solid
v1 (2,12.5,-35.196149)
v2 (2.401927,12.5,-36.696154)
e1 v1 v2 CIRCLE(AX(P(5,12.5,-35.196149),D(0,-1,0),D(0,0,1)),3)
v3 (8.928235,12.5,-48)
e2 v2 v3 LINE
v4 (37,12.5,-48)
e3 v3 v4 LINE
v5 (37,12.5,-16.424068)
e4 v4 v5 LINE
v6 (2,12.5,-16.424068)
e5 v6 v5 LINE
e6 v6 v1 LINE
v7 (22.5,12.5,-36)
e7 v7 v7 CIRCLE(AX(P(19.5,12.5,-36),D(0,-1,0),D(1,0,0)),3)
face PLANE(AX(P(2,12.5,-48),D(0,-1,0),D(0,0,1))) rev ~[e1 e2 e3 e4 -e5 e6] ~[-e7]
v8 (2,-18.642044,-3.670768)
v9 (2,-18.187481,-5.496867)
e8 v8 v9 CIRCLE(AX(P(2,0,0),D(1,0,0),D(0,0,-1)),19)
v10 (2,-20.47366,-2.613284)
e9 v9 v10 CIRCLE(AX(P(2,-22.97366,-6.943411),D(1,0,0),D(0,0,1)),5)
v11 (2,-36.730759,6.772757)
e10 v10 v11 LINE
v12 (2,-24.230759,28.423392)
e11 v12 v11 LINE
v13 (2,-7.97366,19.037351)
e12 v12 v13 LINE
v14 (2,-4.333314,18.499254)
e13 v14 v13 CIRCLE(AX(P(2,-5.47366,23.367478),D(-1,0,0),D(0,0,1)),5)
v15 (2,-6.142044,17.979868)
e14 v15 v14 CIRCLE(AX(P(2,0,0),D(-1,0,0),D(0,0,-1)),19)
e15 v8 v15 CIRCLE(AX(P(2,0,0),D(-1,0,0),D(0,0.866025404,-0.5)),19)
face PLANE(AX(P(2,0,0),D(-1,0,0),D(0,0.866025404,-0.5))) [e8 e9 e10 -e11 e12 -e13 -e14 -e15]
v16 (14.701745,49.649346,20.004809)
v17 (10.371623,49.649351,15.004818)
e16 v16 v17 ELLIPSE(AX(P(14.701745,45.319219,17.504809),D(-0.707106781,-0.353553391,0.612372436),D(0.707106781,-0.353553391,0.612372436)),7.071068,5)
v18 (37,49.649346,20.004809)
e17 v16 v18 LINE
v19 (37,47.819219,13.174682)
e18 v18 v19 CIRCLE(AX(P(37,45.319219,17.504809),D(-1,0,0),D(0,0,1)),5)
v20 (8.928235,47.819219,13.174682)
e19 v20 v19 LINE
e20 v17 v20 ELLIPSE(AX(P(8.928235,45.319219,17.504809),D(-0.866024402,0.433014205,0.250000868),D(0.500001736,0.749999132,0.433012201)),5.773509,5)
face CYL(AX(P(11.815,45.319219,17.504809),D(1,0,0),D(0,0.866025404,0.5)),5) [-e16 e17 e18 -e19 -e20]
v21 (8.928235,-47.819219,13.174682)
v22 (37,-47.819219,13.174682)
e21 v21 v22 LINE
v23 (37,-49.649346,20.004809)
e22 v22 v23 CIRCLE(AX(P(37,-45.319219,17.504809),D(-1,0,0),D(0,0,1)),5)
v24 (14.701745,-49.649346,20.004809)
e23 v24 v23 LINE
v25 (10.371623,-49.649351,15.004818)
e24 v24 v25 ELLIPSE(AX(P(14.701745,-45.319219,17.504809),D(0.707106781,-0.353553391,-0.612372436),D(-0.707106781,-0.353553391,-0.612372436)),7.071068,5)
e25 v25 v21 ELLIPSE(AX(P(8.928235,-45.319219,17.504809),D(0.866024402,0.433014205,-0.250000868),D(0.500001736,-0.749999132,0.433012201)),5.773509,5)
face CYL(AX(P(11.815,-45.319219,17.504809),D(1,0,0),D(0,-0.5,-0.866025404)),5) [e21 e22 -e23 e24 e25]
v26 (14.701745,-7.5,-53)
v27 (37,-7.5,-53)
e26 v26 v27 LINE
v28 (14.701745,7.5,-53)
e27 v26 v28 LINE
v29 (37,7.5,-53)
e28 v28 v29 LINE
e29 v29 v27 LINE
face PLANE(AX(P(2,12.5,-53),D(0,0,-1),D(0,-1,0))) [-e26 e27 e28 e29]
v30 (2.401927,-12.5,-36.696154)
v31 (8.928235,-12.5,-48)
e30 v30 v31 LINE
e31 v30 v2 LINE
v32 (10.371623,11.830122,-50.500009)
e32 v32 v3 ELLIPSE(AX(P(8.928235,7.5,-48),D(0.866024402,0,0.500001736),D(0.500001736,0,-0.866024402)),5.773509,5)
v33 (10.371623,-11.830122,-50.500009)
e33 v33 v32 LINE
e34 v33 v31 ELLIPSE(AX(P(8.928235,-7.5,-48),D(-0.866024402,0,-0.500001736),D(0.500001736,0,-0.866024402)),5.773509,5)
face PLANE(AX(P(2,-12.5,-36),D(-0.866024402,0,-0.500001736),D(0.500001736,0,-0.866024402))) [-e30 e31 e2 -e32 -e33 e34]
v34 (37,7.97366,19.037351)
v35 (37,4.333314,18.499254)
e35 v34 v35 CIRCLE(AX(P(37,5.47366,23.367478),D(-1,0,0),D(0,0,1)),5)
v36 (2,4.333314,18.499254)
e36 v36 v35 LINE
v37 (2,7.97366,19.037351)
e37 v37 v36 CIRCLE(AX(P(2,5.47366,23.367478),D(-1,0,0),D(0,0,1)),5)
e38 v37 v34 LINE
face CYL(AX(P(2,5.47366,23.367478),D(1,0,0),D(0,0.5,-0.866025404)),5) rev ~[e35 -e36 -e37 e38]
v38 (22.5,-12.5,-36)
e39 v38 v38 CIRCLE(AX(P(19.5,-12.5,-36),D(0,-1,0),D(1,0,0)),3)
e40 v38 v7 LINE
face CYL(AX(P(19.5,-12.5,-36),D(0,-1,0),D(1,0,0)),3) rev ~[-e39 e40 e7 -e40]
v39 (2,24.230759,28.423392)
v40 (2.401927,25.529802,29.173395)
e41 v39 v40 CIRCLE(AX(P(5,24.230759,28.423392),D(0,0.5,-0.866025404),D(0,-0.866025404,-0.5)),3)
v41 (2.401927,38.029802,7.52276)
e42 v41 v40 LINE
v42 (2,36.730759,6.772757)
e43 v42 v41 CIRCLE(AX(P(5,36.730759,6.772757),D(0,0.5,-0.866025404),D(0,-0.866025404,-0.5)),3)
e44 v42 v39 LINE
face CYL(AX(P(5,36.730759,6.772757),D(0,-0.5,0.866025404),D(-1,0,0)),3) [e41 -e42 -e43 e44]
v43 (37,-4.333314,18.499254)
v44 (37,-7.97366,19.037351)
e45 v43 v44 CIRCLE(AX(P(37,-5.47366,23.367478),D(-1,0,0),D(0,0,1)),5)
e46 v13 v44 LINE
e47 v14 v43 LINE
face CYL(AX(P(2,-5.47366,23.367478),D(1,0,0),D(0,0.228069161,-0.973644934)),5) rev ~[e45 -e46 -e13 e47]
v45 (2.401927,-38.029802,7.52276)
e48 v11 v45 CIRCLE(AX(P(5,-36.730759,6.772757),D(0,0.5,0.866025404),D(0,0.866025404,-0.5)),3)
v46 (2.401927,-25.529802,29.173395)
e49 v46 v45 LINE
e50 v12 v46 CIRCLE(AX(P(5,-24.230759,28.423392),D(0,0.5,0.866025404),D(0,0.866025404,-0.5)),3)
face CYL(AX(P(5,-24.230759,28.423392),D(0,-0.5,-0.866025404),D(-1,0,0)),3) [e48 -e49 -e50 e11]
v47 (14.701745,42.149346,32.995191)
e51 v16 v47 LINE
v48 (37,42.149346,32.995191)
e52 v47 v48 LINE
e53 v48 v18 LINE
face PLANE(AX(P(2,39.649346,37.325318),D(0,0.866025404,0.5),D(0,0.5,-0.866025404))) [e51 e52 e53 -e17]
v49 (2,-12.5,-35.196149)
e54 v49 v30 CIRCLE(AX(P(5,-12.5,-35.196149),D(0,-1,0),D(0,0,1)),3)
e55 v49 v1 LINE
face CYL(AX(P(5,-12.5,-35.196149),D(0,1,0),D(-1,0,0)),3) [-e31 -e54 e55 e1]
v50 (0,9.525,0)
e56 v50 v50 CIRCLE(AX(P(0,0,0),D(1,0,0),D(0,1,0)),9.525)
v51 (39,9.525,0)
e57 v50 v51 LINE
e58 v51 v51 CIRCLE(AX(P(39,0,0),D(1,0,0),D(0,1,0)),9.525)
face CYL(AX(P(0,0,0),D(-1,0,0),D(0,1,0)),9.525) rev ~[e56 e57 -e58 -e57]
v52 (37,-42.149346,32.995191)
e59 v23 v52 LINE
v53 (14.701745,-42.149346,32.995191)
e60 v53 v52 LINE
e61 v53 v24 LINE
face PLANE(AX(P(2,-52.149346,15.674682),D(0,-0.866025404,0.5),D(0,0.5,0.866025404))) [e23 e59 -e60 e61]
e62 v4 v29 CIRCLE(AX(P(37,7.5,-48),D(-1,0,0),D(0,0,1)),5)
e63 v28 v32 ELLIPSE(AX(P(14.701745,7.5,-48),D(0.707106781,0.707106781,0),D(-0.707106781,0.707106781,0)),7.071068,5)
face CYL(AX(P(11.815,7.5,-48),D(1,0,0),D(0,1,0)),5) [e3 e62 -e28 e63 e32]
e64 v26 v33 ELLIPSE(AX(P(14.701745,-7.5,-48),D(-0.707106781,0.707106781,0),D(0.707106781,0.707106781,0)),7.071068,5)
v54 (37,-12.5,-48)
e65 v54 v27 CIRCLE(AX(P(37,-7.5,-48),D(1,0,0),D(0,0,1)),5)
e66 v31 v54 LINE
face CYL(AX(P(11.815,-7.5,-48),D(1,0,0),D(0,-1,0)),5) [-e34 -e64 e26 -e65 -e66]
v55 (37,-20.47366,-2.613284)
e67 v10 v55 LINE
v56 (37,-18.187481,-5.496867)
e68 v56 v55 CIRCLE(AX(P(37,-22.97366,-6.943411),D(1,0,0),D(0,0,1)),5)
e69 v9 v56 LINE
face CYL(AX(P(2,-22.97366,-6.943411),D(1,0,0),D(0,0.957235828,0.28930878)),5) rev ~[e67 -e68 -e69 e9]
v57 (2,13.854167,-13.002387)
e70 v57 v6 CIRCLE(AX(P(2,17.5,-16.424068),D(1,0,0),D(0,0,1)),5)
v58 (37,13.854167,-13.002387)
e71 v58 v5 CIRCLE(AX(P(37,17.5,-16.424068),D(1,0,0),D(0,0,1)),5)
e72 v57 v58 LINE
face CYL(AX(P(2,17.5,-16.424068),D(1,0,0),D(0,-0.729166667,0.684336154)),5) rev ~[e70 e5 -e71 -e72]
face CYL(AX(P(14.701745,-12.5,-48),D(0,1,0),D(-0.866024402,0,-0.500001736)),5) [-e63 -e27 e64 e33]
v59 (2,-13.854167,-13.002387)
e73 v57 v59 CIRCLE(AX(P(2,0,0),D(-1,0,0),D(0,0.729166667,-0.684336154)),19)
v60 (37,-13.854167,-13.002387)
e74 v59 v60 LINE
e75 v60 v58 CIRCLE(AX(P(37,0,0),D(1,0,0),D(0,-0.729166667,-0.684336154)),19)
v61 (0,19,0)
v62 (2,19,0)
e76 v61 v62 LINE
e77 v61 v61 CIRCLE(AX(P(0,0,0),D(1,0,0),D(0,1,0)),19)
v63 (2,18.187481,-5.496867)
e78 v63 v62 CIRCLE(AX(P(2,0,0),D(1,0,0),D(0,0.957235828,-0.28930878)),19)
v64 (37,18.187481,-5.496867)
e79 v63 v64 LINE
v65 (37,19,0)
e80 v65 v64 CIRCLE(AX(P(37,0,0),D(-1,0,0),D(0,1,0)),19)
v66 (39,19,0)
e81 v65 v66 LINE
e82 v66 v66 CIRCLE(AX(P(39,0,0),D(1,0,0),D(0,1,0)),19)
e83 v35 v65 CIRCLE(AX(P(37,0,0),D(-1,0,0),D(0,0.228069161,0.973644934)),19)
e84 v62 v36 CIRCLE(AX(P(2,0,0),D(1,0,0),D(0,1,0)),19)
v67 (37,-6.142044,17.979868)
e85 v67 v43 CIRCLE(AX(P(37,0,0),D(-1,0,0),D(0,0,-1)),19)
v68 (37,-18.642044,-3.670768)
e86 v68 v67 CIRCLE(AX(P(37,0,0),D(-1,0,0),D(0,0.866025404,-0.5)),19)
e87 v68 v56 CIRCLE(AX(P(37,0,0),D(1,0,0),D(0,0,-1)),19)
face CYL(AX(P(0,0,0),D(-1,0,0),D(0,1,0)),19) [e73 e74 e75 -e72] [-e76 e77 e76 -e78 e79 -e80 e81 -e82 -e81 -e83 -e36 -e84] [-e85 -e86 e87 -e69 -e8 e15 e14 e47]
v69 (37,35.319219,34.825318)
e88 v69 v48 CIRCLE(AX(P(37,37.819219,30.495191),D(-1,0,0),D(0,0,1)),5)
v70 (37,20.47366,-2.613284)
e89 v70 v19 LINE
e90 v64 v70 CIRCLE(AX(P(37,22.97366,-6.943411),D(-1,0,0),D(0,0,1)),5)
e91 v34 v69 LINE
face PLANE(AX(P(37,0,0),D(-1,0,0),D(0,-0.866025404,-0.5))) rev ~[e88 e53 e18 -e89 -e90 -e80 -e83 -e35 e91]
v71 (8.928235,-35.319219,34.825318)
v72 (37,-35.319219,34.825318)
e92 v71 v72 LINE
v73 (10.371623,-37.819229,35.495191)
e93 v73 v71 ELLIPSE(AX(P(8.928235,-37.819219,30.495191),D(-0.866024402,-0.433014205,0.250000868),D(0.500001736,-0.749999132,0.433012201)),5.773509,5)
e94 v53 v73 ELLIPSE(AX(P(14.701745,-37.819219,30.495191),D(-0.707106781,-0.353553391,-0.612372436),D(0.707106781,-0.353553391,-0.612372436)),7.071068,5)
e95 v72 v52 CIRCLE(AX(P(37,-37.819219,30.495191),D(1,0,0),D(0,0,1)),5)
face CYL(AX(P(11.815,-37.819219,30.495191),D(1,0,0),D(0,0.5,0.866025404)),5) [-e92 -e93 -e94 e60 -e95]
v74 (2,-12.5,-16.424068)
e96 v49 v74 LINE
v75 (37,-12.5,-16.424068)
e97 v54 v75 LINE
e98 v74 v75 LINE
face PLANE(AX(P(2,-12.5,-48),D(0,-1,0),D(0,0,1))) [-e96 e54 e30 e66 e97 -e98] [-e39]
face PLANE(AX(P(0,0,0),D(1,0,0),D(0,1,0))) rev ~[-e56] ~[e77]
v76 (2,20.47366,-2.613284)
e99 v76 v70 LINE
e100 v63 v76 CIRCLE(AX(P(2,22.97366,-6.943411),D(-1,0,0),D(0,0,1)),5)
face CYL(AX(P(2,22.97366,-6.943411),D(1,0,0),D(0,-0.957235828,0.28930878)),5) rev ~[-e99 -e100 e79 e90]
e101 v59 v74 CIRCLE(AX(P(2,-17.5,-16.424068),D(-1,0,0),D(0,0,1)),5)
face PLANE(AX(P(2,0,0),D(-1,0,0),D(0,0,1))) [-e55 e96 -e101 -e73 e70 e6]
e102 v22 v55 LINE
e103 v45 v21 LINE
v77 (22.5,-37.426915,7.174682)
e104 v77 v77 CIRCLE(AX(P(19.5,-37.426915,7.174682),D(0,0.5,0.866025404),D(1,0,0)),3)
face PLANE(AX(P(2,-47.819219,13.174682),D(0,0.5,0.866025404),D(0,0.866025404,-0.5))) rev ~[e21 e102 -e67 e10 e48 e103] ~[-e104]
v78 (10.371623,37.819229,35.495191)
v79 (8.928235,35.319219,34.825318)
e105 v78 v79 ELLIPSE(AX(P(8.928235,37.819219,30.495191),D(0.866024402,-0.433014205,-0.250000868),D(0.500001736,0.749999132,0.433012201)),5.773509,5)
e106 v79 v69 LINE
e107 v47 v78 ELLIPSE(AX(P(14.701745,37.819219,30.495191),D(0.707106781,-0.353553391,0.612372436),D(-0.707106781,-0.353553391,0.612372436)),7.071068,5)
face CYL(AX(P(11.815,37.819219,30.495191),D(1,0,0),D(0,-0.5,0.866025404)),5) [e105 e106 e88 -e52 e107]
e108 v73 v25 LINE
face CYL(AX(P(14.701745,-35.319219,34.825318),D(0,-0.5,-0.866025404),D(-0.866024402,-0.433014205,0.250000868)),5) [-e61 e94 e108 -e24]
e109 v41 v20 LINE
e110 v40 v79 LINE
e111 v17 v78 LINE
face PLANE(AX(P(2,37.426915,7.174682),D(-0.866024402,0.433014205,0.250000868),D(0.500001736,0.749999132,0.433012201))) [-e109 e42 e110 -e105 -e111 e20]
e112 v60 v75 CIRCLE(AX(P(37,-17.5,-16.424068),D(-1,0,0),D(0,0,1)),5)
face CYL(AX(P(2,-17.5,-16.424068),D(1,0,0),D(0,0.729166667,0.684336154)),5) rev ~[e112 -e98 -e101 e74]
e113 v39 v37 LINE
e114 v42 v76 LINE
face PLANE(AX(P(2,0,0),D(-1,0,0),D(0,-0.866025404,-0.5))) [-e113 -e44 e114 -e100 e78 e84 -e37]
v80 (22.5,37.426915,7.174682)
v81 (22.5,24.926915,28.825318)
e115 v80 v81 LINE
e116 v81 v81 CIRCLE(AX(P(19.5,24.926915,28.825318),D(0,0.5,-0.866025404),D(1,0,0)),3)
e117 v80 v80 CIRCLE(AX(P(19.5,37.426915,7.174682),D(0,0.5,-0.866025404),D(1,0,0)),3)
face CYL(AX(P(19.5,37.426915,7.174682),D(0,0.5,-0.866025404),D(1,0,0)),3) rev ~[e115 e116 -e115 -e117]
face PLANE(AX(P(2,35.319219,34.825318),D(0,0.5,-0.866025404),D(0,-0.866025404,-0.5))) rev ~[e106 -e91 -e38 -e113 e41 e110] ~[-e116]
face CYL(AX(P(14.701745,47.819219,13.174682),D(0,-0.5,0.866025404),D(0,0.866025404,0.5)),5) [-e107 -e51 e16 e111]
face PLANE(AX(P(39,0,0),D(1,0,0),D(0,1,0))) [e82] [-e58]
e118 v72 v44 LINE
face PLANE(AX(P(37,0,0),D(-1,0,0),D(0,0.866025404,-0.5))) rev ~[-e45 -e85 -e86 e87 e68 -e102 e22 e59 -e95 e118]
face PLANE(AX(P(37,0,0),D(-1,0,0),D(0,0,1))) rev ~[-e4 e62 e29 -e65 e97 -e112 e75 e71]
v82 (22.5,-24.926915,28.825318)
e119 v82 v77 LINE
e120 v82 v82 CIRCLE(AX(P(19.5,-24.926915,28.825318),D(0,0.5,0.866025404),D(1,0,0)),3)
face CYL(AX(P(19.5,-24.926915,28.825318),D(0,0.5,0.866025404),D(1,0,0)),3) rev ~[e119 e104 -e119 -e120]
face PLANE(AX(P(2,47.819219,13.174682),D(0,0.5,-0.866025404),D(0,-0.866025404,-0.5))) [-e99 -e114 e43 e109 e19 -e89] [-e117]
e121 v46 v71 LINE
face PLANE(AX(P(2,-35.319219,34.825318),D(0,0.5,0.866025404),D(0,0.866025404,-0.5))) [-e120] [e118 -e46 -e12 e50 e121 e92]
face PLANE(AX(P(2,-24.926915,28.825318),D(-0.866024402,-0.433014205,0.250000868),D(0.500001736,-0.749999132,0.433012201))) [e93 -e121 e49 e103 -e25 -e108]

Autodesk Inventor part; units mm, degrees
ref_plane "YZ Plane" through (0, 0, 0) normal (1, 0, 0) x (0, 1, 0)
ref_plane "XZ Plane" through (0, 0, 0) normal (0, 1, 0) x (-1, 0, 0)
sketch "Sketch1" plane through (0, 0, 0) normal (1, 0, 0) x (0, 1, 0)
  circle A0 centre (0, 0) radius 19
  circle A1 centre (0, 0) radius 9.525
  dimension "d0" = 38
  dimension "d1" = 19.05
extrude "Extrusion1" add sketch "Sketch1" along normal blind 39
ref_plane "Work Plane1" through (2, 0, 0) normal (-1, 0, 0) x (0, 0, 1)
sketch "Sketch3" plane through (2, 0, 0) normal (-1, 0, 0) x (0, 0, 1)
  line L0 (0, 0) -> (-53, 0) construction
  line L1 (-48, 12.5) -> (-14.3091, 12.5)
  line L2 (-48, -12.5) -> (-14.3091, -12.5)
  circle A0 centre (0, 0) radius 19 projected
  line L3 (-48, 12.5) -> (-53, 12.5)
  line L4 (-53, -12.5) -> (-48, -12.5)
  line L5 (-53, 12.5) -> (-53, -12.5)
  dimension "d14" = 25
extrude "Extrusion2" add sketch "Sketch3" against normal blind 35 contours L1 A0 L2 L4 L5 L3
sketch "Sketch4" plane through (2, -12.5, -48) normal (0, -1, 0) x (1, 0, 0)
  line L0 (-9.6665, 48) -> (46.4461, 48) construction
  line L1 (0, -5) -> (35, -5) projected
  circle A0 centre (17.5, 12) radius 3
  line L2 (17.5, 12) -> (-11.0793, 12) construction
  line L3 (0, 33.6909) -> (0, -5) projected
  line L4 (0, 12) -> (9.815, -5)
  line L5 (0, 12) -> (29, 12) construction
  line L6 (9.815, -5) -> (0, -5)
  line L7 (0, 12) -> (0, -5)
  point P0 (-2, 48)
  point P1 (0, 0)
  dimension "d19" = 6
  dimension "d22" = 60
extrude "Extrusion3" cut sketch "Sketch4" against normal blind 25
fillet "Fillet1" radius 5 5 edges at (11.815, 0, -53) (24.4075, 12.5, -53) (24.4075, -12.5, -53) (19.5, -12.5, -14.3091) (19.5, 12.5, -14.3091)
fillet "Fillet2" radius 3 1 edges at (2, 0, -36)
pattern_circular "Circular Pattern1" count 3 over 360 about axis through (0, 0, 0) along (1, 0, 0) of "Extrusion2", "Extrusion3", "Fillet1", "Fillet2"
thread "Thread1" size "M20x1.5" class "6H" standard "ANSI Metric M Profile" full length
properties part number "aranha"
